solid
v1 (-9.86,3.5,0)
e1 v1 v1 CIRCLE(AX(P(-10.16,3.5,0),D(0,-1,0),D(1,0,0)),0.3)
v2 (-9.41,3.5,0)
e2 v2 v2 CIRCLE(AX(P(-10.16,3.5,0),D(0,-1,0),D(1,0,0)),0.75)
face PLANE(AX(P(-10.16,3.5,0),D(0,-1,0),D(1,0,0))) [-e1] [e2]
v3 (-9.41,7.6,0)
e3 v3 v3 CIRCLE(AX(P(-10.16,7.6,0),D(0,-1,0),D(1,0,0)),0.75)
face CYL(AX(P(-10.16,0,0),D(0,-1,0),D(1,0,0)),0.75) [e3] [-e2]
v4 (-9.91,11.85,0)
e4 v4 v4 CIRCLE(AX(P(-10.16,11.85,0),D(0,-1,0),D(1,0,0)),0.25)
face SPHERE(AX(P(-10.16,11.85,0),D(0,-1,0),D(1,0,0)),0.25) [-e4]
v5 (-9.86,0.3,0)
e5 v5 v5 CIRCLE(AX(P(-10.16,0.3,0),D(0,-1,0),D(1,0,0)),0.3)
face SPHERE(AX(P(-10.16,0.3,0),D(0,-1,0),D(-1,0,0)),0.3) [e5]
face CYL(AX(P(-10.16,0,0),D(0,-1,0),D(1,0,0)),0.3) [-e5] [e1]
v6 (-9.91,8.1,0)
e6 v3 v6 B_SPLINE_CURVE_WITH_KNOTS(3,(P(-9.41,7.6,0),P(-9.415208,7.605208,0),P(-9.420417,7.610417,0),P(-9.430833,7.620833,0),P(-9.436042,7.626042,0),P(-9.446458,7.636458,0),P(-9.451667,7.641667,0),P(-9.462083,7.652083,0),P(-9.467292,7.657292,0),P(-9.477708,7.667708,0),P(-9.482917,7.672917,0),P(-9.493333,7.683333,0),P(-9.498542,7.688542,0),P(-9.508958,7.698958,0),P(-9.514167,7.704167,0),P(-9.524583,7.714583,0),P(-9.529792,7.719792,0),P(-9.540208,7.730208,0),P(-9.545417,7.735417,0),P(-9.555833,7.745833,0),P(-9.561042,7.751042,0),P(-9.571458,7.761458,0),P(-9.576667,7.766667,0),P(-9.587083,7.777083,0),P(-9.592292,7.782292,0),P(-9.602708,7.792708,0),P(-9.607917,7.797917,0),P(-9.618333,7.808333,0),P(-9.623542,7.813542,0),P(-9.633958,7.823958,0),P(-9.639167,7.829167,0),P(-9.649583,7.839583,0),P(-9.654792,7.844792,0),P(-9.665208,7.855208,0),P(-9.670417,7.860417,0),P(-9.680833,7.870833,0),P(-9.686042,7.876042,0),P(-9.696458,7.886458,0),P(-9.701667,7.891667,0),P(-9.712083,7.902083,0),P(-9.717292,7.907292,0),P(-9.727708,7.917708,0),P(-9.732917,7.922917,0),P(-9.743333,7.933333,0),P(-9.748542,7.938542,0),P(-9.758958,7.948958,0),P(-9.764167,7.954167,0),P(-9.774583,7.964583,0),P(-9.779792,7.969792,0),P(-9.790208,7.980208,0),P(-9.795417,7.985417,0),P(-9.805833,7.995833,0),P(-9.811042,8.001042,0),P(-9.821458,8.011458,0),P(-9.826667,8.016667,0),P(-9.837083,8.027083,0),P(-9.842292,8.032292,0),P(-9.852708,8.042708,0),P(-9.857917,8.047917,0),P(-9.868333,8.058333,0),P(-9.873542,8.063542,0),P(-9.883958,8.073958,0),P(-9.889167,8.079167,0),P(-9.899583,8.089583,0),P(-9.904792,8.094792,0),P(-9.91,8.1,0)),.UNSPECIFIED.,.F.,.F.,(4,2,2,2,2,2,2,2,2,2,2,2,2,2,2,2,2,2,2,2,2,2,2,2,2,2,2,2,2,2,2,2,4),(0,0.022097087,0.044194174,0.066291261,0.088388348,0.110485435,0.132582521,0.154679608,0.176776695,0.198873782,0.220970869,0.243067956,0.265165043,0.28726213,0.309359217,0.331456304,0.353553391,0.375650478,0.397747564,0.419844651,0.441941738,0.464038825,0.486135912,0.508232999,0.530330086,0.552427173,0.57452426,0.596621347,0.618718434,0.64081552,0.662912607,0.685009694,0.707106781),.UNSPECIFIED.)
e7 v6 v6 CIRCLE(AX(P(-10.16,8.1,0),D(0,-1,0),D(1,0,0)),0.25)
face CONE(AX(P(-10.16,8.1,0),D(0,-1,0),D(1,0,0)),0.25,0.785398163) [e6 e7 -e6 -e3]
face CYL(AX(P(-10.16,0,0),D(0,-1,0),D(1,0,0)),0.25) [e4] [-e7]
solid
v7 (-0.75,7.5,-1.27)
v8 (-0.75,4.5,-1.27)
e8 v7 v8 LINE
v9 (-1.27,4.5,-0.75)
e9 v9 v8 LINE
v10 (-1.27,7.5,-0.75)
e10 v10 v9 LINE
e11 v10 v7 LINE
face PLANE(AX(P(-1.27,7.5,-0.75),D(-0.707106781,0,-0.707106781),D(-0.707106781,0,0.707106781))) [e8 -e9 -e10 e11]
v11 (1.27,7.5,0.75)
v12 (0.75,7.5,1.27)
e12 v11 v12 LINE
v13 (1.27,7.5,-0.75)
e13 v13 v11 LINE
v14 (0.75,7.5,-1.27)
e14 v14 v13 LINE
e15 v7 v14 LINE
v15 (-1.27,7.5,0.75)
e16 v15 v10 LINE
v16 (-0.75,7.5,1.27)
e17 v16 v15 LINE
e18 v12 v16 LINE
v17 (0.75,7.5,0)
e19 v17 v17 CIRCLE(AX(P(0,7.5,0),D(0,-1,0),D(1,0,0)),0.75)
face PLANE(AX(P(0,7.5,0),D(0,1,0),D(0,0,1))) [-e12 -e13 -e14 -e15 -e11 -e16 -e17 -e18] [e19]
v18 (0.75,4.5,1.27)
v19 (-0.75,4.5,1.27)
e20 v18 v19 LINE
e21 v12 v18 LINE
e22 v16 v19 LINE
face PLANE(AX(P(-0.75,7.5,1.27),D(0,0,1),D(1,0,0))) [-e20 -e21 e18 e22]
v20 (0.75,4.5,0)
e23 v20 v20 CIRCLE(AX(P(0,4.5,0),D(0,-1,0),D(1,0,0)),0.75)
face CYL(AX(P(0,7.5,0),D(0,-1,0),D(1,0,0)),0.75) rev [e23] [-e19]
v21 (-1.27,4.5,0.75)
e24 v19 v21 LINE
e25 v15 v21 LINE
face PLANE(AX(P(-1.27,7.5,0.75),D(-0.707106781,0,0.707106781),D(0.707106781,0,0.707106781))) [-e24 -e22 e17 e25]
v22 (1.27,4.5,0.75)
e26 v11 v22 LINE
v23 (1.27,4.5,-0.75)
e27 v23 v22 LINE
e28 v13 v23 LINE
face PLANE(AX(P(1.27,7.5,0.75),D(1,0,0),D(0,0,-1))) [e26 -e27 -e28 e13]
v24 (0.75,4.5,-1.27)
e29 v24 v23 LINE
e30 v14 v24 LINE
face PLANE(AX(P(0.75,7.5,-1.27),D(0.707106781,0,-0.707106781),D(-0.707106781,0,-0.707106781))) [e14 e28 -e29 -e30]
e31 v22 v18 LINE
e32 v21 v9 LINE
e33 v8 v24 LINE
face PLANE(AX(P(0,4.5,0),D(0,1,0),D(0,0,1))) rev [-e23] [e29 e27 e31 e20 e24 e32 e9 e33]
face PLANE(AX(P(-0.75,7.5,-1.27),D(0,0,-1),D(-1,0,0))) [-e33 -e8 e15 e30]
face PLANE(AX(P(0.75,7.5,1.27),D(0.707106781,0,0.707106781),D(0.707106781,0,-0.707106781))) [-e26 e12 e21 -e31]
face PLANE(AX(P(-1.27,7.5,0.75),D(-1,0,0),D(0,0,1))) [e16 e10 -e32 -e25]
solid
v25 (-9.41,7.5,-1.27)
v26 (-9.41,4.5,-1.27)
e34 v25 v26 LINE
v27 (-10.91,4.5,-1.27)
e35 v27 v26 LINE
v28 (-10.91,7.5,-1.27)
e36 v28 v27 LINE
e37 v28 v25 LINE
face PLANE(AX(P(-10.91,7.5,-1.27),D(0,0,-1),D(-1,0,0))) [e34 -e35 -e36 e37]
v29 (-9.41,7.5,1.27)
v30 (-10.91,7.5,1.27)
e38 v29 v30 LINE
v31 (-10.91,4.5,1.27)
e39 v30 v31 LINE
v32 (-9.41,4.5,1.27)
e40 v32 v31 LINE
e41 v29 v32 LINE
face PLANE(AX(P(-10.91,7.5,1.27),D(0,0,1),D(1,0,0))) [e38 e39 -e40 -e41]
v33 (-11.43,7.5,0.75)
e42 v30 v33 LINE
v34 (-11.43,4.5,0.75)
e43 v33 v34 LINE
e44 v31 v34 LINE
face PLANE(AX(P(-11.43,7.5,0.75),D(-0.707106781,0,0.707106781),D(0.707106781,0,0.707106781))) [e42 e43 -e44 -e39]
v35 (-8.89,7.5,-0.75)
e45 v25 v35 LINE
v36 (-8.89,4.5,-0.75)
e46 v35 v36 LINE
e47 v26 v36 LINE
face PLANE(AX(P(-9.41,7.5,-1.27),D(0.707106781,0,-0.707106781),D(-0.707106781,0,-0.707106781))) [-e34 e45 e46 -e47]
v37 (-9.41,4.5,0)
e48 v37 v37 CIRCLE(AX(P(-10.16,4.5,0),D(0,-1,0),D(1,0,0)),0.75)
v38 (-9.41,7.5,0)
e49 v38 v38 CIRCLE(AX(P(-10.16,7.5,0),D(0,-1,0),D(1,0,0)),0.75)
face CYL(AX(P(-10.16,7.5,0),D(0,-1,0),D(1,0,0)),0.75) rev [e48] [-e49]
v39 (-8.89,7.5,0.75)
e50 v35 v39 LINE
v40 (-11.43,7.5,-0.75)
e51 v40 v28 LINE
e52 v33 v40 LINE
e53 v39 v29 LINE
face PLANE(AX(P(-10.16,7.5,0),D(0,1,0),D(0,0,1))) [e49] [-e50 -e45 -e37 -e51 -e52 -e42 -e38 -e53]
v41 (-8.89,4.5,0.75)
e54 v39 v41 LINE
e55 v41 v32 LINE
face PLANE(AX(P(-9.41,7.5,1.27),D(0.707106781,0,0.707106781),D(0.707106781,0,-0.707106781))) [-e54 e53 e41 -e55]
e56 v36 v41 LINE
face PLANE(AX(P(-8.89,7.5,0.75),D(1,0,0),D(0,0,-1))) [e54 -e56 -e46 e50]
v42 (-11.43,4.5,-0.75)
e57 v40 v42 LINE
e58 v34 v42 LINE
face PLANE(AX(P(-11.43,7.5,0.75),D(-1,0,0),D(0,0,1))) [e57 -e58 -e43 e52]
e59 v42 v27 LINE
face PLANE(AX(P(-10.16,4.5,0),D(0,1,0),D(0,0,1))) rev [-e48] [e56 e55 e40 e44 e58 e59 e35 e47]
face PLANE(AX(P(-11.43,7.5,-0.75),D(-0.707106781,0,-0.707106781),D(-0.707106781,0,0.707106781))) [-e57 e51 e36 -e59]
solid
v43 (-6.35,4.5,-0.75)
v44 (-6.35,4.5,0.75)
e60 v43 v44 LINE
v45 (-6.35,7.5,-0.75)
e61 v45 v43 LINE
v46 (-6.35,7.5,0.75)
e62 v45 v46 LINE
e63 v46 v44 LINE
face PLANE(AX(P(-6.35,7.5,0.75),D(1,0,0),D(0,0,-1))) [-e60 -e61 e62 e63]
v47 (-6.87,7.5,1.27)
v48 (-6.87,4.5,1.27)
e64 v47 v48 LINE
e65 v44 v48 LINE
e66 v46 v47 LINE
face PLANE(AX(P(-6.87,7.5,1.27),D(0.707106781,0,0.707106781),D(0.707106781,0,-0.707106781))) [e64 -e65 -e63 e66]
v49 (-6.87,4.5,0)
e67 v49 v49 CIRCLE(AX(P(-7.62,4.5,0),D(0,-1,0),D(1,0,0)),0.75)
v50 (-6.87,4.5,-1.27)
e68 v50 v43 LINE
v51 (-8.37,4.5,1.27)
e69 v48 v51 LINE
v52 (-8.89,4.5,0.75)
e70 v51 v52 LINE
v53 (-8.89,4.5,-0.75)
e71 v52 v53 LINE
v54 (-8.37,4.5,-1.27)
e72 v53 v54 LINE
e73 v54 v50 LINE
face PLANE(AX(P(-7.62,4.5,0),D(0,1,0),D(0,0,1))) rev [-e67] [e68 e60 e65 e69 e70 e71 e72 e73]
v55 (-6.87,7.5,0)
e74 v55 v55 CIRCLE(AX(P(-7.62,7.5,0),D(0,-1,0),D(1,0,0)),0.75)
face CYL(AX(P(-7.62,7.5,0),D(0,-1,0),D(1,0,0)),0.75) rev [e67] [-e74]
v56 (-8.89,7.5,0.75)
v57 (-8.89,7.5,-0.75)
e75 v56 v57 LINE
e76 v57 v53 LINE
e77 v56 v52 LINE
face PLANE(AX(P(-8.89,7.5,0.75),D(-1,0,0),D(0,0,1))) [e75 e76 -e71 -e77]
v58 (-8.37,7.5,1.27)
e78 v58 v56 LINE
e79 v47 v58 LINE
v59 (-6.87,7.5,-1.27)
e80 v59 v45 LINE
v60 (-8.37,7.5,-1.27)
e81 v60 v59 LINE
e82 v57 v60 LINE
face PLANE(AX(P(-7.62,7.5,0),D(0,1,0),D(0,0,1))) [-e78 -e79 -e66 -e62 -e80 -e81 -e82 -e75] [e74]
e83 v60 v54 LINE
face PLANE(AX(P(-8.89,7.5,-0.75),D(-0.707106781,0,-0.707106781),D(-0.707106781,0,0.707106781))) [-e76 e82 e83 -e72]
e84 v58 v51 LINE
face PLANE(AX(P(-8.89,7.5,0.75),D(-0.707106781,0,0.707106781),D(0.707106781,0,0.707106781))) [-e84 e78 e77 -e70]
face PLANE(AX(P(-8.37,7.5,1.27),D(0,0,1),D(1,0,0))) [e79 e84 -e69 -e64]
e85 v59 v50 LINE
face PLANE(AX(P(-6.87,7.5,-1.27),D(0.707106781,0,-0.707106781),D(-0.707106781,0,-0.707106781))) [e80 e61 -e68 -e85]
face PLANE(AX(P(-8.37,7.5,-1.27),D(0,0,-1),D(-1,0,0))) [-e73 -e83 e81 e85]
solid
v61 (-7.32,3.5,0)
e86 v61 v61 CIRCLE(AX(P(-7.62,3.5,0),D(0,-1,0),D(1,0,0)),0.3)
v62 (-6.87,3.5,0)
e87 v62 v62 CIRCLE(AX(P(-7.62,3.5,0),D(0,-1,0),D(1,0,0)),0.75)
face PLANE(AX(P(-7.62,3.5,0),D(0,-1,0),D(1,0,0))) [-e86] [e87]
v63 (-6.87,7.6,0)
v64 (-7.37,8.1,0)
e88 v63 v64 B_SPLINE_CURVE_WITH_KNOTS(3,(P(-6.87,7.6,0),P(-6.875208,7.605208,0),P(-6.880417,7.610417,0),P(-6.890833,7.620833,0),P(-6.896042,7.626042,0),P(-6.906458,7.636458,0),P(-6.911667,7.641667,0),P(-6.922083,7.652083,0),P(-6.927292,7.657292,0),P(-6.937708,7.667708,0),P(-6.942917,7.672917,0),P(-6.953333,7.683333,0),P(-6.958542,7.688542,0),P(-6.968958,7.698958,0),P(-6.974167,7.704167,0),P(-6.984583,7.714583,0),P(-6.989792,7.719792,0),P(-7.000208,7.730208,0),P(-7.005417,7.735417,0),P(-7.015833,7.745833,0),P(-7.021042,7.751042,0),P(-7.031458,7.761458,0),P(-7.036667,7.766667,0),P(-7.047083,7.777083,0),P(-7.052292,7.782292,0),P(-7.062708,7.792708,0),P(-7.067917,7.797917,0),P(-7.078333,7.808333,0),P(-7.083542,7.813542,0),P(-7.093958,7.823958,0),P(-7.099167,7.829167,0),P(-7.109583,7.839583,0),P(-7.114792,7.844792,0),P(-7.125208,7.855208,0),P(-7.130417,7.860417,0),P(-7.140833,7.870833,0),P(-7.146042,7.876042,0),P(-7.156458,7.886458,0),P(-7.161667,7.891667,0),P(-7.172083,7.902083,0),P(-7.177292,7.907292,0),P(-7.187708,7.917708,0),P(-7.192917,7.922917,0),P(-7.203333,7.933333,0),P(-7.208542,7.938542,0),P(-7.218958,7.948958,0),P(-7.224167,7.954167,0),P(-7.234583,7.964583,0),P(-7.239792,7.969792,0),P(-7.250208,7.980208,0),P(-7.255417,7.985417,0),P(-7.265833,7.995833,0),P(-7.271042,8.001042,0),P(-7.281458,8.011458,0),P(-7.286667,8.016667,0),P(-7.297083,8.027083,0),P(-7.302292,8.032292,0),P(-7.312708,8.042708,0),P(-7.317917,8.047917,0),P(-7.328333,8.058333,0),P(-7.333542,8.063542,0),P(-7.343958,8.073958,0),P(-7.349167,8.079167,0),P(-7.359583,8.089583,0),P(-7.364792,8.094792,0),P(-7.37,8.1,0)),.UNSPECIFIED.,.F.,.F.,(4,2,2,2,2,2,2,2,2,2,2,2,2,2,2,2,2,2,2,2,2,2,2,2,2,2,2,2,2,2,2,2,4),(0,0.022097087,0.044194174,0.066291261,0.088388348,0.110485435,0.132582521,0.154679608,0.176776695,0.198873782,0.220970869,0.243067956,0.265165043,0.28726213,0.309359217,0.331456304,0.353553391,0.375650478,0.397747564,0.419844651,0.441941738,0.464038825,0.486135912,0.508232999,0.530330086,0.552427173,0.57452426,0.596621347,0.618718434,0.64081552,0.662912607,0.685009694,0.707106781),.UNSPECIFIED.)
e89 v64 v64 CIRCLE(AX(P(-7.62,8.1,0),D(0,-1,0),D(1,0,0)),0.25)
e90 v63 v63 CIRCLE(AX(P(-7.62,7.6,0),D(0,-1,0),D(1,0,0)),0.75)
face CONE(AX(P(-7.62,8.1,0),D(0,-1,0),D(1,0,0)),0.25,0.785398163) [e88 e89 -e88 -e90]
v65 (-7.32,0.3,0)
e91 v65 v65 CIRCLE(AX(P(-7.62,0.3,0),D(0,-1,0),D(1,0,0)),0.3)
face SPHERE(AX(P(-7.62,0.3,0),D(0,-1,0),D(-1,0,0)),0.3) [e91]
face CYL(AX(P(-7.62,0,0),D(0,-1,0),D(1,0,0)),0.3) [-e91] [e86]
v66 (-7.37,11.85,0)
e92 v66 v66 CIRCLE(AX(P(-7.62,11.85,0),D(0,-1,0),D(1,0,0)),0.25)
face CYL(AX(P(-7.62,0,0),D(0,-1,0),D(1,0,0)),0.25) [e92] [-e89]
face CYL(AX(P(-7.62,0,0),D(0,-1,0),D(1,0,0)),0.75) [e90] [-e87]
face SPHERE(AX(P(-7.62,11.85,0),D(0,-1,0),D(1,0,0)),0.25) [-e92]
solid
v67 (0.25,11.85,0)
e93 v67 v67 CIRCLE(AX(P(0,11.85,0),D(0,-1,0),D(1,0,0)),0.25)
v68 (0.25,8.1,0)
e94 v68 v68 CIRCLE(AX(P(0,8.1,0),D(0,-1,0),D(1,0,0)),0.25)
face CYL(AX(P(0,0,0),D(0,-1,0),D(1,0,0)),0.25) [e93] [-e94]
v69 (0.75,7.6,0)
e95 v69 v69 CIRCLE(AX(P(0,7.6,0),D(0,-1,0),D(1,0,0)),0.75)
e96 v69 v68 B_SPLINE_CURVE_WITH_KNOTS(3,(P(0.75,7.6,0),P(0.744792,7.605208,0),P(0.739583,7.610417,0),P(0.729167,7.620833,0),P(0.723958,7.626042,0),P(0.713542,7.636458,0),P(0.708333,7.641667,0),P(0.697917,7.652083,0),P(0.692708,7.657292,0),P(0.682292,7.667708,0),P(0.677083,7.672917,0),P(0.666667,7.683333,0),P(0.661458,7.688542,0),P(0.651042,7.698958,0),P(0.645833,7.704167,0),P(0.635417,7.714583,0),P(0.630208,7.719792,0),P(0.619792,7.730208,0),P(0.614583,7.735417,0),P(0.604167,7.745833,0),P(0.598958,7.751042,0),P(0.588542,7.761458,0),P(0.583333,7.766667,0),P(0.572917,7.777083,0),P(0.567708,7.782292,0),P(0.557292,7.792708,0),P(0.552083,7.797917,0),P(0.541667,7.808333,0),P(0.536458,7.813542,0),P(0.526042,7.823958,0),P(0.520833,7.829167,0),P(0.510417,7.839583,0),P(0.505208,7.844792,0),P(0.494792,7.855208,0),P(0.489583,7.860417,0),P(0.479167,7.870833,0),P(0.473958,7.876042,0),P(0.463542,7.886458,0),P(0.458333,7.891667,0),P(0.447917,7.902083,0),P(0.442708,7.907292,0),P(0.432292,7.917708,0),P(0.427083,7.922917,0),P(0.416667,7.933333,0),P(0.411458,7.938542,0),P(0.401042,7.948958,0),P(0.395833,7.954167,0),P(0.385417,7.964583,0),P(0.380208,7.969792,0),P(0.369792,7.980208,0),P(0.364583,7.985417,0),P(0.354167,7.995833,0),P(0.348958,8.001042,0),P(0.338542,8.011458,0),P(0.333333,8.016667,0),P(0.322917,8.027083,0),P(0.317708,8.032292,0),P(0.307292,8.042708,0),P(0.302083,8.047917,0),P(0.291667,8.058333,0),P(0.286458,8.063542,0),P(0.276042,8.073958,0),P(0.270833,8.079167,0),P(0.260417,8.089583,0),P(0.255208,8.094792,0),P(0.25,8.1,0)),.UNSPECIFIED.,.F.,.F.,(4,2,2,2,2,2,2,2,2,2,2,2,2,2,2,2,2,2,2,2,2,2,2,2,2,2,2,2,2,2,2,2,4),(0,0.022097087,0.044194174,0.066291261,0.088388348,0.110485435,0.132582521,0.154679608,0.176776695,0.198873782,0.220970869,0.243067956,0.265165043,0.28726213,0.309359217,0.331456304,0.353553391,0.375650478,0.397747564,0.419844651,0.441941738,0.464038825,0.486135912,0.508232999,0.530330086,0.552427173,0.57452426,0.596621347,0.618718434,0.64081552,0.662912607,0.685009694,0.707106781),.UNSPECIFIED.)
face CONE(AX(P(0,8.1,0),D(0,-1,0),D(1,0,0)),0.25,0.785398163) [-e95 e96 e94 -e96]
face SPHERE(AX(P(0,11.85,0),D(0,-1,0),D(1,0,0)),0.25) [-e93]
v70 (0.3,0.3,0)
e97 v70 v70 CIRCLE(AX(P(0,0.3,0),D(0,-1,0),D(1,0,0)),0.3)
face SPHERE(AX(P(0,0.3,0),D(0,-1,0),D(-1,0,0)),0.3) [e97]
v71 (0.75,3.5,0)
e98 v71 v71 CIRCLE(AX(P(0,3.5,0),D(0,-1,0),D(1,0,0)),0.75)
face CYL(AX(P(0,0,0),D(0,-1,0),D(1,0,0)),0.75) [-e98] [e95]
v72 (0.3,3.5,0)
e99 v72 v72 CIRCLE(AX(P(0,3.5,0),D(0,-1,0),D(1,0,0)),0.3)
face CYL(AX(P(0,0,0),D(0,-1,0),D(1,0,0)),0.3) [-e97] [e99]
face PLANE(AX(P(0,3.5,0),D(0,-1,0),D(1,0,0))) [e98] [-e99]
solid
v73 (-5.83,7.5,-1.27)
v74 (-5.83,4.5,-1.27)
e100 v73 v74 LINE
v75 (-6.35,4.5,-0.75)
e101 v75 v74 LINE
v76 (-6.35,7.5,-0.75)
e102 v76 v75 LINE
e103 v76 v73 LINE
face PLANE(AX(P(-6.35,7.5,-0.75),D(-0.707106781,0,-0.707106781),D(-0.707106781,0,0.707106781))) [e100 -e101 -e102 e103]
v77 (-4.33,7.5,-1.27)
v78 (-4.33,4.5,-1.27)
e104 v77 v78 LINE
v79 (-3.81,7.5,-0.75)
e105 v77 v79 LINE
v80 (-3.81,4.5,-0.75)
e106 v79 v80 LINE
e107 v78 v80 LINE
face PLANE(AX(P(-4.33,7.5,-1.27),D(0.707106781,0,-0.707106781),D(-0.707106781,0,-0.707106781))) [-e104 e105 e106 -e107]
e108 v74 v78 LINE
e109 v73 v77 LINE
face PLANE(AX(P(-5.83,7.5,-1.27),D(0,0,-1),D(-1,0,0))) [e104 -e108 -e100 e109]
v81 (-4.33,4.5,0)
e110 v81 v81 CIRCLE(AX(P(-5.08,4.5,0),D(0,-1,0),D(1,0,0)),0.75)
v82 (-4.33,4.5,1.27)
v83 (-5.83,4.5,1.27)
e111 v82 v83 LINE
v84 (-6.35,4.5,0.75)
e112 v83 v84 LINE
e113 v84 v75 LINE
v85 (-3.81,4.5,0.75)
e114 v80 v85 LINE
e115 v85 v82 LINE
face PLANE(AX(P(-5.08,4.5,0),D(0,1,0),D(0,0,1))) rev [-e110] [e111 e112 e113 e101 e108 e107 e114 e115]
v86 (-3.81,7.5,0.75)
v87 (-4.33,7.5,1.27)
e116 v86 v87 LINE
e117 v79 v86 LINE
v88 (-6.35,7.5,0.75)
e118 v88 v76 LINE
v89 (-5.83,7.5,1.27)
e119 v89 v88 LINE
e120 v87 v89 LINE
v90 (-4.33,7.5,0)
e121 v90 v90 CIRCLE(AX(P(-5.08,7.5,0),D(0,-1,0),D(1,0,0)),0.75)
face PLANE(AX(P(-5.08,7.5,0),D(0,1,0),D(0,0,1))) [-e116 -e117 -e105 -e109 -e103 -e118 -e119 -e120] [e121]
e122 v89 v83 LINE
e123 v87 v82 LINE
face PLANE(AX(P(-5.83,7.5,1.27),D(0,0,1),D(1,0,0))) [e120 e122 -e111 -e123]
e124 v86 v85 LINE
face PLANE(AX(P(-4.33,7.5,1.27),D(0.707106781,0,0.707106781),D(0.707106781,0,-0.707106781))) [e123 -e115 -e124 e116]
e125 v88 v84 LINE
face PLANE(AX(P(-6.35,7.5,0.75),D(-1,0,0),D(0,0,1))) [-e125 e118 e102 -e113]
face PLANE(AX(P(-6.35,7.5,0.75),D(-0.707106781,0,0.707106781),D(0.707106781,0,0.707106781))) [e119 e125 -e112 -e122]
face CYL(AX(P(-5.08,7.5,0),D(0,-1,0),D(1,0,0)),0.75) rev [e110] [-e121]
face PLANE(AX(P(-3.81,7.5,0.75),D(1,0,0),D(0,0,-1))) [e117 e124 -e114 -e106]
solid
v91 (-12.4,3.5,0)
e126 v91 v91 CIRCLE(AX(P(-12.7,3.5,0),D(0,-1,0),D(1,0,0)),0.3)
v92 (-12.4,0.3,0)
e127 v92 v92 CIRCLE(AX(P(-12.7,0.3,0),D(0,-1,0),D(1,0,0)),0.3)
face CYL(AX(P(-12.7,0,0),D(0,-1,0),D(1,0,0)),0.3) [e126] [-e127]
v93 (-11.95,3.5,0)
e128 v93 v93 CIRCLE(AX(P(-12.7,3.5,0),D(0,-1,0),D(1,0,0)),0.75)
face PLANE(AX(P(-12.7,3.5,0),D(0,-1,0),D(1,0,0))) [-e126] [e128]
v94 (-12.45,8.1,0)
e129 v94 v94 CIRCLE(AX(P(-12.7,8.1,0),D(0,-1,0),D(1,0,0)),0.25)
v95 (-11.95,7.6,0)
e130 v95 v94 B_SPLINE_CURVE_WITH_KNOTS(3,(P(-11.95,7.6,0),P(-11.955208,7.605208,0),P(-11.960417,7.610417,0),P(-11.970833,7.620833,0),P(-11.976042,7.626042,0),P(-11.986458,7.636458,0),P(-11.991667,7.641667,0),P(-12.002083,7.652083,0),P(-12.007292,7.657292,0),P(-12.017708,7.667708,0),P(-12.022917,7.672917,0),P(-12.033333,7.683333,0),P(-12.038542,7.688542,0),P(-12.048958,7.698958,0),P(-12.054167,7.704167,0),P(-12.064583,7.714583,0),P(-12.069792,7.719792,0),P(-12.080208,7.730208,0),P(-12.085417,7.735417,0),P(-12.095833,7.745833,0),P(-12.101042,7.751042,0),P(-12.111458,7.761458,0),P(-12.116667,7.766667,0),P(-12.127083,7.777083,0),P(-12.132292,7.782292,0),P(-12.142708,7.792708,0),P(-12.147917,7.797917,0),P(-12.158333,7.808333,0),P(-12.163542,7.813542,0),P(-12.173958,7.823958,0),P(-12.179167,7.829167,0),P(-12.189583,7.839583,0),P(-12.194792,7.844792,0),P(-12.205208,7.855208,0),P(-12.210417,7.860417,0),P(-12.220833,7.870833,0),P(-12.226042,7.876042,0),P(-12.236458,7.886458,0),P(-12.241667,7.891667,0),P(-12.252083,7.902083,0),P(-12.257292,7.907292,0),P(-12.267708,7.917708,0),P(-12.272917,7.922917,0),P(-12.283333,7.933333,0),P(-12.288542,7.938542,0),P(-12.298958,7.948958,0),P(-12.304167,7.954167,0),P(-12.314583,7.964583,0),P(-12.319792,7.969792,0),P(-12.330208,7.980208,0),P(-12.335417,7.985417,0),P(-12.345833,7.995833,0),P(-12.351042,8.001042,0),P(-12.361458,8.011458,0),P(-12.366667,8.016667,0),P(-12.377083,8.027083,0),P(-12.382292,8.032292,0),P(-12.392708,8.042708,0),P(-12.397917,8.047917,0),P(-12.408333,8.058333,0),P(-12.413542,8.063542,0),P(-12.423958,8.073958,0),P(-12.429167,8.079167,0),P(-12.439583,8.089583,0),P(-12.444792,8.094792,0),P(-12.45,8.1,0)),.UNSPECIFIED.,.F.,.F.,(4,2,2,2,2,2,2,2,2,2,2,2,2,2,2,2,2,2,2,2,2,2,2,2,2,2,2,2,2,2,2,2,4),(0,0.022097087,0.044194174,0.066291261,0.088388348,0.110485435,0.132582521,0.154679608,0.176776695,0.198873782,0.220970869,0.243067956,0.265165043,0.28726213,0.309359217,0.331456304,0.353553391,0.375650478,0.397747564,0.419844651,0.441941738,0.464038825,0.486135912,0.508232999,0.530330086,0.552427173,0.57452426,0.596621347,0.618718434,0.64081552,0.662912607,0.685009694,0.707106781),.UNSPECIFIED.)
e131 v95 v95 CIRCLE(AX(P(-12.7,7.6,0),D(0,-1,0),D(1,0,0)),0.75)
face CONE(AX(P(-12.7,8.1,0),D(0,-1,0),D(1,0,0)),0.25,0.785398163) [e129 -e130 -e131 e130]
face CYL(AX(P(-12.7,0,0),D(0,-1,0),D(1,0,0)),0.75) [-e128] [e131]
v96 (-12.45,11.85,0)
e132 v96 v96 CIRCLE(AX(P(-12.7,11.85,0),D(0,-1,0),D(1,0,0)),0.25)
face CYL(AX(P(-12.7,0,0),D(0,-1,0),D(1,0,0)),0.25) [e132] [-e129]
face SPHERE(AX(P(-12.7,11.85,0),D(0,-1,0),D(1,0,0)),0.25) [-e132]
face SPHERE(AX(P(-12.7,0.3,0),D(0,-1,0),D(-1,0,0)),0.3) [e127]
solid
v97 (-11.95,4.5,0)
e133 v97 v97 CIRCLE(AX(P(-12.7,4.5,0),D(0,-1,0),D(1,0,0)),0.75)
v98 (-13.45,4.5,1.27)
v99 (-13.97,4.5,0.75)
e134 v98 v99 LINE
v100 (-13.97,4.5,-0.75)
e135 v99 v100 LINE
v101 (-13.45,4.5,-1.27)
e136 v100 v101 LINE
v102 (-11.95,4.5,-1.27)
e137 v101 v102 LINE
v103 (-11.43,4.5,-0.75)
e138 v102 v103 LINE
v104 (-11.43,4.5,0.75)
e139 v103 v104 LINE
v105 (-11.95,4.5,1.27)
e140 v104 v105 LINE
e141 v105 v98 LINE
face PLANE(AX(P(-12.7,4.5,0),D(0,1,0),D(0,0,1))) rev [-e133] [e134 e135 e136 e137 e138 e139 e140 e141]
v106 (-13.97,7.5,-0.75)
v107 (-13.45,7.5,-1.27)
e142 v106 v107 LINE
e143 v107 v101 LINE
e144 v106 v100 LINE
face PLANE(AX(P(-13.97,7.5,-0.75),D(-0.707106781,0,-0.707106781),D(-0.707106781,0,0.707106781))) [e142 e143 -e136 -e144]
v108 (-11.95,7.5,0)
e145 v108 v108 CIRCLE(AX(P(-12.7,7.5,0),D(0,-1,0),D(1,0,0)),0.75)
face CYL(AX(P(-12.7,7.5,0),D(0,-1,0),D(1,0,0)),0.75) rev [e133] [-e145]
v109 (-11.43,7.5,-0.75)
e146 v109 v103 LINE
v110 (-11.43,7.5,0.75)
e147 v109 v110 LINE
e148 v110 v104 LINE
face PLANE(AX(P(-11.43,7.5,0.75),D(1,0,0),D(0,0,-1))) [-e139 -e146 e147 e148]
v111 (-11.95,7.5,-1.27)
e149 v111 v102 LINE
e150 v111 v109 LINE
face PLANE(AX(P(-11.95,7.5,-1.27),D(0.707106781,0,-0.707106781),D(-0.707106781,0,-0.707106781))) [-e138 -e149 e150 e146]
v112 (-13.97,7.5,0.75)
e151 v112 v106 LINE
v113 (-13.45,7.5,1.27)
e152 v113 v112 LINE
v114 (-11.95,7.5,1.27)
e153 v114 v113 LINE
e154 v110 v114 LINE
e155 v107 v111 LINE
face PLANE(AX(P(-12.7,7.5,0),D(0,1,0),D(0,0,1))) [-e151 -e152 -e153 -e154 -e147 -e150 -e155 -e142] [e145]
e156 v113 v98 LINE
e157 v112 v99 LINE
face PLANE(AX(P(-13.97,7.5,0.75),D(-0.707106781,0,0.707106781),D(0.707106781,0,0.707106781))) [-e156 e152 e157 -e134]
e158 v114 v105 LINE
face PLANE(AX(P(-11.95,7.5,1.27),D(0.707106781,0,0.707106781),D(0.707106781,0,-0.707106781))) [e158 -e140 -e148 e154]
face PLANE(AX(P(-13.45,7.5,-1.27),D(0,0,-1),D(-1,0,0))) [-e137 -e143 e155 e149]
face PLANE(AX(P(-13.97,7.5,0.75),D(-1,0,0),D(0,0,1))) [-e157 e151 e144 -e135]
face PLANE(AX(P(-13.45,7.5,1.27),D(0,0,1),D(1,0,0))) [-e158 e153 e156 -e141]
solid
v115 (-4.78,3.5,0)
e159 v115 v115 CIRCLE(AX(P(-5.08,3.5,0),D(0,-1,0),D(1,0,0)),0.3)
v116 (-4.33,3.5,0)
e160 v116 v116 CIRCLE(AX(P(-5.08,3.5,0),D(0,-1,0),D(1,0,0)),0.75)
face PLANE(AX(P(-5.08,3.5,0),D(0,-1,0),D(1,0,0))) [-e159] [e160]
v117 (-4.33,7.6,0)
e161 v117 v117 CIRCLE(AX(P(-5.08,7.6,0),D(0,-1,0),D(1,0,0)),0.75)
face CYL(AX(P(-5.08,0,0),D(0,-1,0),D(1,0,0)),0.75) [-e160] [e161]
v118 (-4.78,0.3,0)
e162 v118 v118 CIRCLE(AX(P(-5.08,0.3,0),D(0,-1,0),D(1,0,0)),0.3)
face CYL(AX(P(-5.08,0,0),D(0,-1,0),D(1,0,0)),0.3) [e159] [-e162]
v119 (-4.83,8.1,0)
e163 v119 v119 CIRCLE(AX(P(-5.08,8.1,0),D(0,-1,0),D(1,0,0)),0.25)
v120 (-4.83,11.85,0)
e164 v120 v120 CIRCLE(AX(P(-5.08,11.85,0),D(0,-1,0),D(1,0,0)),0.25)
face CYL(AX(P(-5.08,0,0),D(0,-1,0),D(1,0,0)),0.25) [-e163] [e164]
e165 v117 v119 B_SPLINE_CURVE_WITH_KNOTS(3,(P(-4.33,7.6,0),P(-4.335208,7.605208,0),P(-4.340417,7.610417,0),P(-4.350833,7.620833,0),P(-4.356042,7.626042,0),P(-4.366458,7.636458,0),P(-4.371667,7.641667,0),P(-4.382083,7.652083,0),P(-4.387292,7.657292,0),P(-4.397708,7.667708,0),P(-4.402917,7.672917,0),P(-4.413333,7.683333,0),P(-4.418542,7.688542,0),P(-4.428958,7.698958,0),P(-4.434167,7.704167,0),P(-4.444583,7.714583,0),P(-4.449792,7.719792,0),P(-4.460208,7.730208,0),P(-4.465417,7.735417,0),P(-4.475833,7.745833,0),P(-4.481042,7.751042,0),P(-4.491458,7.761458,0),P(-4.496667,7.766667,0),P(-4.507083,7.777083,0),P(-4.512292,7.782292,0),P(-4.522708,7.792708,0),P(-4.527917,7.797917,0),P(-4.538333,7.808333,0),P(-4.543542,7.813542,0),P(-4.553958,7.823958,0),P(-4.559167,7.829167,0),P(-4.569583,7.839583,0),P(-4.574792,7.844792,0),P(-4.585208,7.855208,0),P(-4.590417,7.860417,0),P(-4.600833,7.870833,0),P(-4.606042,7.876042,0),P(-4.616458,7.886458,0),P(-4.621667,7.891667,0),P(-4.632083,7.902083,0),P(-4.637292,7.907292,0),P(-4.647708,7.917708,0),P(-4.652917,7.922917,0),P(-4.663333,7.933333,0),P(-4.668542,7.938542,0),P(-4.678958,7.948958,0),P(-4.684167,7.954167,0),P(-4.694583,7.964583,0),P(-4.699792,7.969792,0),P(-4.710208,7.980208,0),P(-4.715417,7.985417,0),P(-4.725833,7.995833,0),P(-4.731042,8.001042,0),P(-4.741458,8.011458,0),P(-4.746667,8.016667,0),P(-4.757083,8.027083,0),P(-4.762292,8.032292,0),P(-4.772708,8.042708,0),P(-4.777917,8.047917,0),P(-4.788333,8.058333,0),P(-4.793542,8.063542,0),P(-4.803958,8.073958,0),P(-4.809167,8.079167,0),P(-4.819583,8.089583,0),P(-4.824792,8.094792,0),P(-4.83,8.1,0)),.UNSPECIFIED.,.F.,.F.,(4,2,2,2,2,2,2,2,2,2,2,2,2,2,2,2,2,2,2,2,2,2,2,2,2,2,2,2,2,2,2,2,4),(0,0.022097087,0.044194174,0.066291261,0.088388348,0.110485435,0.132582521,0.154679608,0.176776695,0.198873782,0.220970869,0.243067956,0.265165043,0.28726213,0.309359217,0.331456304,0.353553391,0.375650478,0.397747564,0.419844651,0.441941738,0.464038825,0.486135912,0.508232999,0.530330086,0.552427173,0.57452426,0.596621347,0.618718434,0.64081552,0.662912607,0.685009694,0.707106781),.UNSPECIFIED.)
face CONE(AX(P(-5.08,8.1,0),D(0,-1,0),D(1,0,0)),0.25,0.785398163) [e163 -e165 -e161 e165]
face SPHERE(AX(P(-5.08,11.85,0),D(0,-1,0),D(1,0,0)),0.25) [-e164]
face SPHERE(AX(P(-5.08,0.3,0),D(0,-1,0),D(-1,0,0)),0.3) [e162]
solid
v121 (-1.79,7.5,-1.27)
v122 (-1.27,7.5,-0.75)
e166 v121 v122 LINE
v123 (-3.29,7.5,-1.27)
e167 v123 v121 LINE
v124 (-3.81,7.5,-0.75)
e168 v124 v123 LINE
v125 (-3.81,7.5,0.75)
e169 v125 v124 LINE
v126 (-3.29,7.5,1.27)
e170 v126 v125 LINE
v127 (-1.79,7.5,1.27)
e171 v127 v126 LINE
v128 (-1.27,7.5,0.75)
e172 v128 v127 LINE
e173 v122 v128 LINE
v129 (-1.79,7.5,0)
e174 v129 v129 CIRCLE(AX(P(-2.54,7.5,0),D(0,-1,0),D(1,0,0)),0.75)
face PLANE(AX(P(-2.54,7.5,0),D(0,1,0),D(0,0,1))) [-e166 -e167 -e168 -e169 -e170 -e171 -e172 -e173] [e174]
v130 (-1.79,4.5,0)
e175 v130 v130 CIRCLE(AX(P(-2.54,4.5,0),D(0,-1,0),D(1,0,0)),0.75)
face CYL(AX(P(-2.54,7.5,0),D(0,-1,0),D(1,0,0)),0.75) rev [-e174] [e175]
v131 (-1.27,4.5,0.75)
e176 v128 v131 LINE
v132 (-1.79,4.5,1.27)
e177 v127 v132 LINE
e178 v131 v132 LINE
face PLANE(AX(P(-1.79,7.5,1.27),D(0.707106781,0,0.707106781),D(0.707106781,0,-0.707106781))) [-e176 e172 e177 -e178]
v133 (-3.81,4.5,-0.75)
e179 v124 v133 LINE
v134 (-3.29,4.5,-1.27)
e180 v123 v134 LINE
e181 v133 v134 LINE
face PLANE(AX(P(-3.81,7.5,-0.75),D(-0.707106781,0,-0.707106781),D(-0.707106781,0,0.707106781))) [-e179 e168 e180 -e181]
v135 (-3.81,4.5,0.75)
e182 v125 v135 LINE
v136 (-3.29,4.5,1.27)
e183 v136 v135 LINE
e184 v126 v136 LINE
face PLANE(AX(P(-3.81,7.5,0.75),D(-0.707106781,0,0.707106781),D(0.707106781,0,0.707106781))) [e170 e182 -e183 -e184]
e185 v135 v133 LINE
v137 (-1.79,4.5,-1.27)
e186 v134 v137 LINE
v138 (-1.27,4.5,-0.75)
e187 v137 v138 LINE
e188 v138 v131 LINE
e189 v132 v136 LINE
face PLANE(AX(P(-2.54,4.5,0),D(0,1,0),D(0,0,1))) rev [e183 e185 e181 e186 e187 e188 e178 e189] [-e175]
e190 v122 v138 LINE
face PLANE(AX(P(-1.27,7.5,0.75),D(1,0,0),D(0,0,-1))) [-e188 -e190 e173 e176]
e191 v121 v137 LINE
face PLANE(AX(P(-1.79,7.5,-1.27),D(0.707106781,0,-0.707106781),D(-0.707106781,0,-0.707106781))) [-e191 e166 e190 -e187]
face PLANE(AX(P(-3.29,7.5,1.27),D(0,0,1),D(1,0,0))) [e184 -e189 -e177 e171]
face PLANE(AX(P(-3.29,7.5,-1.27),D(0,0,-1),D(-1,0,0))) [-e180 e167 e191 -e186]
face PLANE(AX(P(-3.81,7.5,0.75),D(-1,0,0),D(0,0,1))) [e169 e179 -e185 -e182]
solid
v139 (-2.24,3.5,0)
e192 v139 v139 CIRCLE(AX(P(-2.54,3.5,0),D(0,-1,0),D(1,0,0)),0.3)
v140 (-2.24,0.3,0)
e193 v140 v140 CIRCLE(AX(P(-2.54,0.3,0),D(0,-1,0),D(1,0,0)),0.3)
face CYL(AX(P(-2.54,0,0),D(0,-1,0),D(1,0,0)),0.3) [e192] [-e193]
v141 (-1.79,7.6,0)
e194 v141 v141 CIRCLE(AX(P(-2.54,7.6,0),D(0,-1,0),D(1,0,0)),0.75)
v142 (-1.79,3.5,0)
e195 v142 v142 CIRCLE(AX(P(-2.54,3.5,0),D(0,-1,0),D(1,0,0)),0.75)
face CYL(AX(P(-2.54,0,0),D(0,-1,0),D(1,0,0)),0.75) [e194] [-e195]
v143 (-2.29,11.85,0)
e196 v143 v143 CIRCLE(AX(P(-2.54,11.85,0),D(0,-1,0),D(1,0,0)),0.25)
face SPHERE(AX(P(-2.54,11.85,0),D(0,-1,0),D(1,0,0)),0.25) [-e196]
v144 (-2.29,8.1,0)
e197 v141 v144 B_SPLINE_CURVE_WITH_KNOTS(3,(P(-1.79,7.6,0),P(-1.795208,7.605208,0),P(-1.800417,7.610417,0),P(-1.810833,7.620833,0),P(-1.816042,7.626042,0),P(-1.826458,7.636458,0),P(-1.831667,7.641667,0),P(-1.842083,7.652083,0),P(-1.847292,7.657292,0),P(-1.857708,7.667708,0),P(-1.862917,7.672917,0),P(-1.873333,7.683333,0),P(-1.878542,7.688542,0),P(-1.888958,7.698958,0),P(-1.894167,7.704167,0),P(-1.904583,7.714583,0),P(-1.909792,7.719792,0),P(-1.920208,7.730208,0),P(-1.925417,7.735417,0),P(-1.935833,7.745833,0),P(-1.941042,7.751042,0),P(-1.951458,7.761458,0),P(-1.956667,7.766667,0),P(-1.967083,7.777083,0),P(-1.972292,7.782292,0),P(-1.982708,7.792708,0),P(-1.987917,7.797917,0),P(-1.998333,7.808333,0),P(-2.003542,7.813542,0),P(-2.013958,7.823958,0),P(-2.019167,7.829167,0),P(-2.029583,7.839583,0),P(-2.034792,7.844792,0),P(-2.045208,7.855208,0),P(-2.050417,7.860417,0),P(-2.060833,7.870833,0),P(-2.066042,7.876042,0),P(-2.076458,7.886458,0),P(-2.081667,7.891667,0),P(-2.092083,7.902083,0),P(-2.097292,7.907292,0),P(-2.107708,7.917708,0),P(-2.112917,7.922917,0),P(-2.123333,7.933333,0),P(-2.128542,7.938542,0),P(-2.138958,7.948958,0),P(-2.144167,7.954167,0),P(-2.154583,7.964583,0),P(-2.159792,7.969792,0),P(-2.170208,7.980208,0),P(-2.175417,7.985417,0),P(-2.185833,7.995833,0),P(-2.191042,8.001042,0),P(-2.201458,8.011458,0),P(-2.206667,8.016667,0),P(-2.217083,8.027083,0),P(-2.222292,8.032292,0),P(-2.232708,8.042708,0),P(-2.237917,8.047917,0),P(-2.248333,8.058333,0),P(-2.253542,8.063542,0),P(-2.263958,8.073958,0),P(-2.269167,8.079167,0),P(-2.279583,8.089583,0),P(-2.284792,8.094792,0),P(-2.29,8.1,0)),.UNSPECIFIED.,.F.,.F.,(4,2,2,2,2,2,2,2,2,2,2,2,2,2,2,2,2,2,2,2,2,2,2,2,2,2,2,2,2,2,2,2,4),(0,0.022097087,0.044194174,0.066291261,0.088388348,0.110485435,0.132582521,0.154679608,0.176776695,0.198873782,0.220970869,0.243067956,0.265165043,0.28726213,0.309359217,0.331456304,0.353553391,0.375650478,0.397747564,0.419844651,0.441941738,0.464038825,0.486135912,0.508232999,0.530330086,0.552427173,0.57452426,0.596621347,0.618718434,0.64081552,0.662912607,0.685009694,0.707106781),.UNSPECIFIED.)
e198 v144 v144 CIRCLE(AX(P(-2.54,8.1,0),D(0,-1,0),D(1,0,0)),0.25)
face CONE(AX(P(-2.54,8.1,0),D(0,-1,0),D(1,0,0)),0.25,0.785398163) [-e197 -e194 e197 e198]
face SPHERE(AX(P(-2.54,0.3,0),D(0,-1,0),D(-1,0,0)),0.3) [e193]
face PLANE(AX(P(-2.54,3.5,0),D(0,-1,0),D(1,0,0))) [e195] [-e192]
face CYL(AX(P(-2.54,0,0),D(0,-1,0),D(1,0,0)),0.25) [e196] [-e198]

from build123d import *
from build123d.topology import SkipClean

# Parameters (mm, degrees)
EXTRUDE_START          = -1
SKETCH_3_R             = 0.75
EXTRUDE_1_DEPTH        = 3
PATTERN_LINEAR_1_COUNT = 6
PATTERN_LINEAR_1_PITCH = 2.54


with BuildPart() as part:
    # Эскиз2 → Повернуть1 (revolve)
    with SkipClean():  # the faces are left unmerged after this step: merging them gives an invalid solid
        with BuildSketch(Plane.XY):
            with BuildLine():
                Line((0, 11.6), (0, 0.6))
                ThreePointArc((0, 0.6), (0.212132034, 0.512132034), (0.3, 0.3))
                Line((0.3, 0.3), (0.3, 3.5))
                Line((0.3, 3.5), (0.75, 3.5))
                Line((0.75, 3.5), (0.75, 7.6))
                Line((0.75, 7.6), (0.25, 8.1))
                Line((0.25, 8.1), (0.25, 11.85))
                ThreePointArc((0.25, 11.85), (0.176776695, 11.673223305), (0, 11.6))
            make_face()
            with BuildLine():
                ThreePointArc((0, 0.6), (-0.3, 0.3), (0, 0))
                Line((0, 0), (0, 0.6))
            make_face()
            with BuildLine():
                Line((0, 0.6), (0, 0))
                ThreePointArc((0, 0), (0.212132034, 0.087867966), (0.3, 0.3))
                ThreePointArc((0.3, 0.3), (0.212132034, 0.512132034), (0, 0.6))
            make_face()
            with BuildLine():
                ThreePointArc((0, 12.1), (-0.25, 11.85), (0, 11.6))
                Line((0, 11.6), (0, 12.1))
            make_face()
            with BuildLine():
                Line((0, 12.1), (0, 11.6))
                ThreePointArc((0, 11.6), (0.176776695, 11.673223305), (0.25, 11.85))
                ThreePointArc((0.25, 11.85), (0.176776695, 12.026776695), (0, 12.1))
            make_face()
        revolve(axis=Axis((0, 0, 0), (0, 1, 0)))
    add(part.part.scale(1), mode=Mode.REPLACE)  # the faces are merged on a copy


with BuildPart() as body_2:
    # Эскиз3 → Бобышка-Вытянуть1 (new body)
    with BuildSketch(Plane.XZ.offset(-3.5).offset(EXTRUDE_START)):
        Polygon((-0.75, 1.27), (0.75, 1.27), (1.27, 0.75), (1.27, -0.75), (0.75, -1.27), (-0.75, -1.27), (-1.27, -0.75), (-1.27, 0.75), align=None)
        Circle(SKETCH_3_R, mode=Mode.SUBTRACT)
    extrude(amount=-EXTRUDE_1_DEPTH)


with BuildPart() as pattern_linear_1_1:
    # Линейный массив1: pattern copy
    add(body_2.part.moved(Location(Vector(-1, 0, 0) * (1 * PATTERN_LINEAR_1_PITCH))))


with BuildPart() as pattern_linear_1_2:
    # Линейный массив1: pattern copy
    add(body_2.part.moved(Location(Vector(-1, 0, 0) * (2 * PATTERN_LINEAR_1_PITCH))))


with BuildPart() as pattern_linear_1_3:
    # Линейный массив1: pattern copy
    add(body_2.part.moved(Location(Vector(-1, 0, 0) * (3 * PATTERN_LINEAR_1_PITCH))))


with BuildPart() as pattern_linear_1_4:
    # Линейный массив1: pattern copy
    add(body_2.part.moved(Location(Vector(-1, 0, 0) * (4 * PATTERN_LINEAR_1_PITCH))))


with BuildPart() as pattern_linear_1_5:
    # Линейный массив1: pattern copy
    add(body_2.part.moved(Location(Vector(-1, 0, 0) * (5 * PATTERN_LINEAR_1_PITCH))))


with BuildPart() as pattern_linear_1_6:
    # Линейный массив1: pattern copy
    add(part.part.moved(Location(Vector(-1, 0, 0) * (1 * PATTERN_LINEAR_1_PITCH))))


with BuildPart() as pattern_linear_1_7:
    # Линейный массив1: pattern copy
    add(part.part.moved(Location(Vector(-1, 0, 0) * (2 * PATTERN_LINEAR_1_PITCH))))


with BuildPart() as pattern_linear_1_8:
    # Линейный массив1: pattern copy
    add(part.part.moved(Location(Vector(-1, 0, 0) * (3 * PATTERN_LINEAR_1_PITCH))))


with BuildPart() as pattern_linear_1_9:
    # Линейный массив1: pattern copy
    add(part.part.moved(Location(Vector(-1, 0, 0) * (4 * PATTERN_LINEAR_1_PITCH))))


with BuildPart() as pattern_linear_1_10:
    # Линейный массив1: pattern copy
    add(part.part.moved(Location(Vector(-1, 0, 0) * (5 * PATTERN_LINEAR_1_PITCH))))


solid = Compound([part.part, body_2.part, pattern_linear_1_1.part, pattern_linear_1_2.part, pattern_linear_1_3.part, pattern_linear_1_4.part, pattern_linear_1_5.part, pattern_linear_1_6.part, pattern_linear_1_7.part, pattern_linear_1_8.part, pattern_linear_1_9.part, pattern_linear_1_10.part])
